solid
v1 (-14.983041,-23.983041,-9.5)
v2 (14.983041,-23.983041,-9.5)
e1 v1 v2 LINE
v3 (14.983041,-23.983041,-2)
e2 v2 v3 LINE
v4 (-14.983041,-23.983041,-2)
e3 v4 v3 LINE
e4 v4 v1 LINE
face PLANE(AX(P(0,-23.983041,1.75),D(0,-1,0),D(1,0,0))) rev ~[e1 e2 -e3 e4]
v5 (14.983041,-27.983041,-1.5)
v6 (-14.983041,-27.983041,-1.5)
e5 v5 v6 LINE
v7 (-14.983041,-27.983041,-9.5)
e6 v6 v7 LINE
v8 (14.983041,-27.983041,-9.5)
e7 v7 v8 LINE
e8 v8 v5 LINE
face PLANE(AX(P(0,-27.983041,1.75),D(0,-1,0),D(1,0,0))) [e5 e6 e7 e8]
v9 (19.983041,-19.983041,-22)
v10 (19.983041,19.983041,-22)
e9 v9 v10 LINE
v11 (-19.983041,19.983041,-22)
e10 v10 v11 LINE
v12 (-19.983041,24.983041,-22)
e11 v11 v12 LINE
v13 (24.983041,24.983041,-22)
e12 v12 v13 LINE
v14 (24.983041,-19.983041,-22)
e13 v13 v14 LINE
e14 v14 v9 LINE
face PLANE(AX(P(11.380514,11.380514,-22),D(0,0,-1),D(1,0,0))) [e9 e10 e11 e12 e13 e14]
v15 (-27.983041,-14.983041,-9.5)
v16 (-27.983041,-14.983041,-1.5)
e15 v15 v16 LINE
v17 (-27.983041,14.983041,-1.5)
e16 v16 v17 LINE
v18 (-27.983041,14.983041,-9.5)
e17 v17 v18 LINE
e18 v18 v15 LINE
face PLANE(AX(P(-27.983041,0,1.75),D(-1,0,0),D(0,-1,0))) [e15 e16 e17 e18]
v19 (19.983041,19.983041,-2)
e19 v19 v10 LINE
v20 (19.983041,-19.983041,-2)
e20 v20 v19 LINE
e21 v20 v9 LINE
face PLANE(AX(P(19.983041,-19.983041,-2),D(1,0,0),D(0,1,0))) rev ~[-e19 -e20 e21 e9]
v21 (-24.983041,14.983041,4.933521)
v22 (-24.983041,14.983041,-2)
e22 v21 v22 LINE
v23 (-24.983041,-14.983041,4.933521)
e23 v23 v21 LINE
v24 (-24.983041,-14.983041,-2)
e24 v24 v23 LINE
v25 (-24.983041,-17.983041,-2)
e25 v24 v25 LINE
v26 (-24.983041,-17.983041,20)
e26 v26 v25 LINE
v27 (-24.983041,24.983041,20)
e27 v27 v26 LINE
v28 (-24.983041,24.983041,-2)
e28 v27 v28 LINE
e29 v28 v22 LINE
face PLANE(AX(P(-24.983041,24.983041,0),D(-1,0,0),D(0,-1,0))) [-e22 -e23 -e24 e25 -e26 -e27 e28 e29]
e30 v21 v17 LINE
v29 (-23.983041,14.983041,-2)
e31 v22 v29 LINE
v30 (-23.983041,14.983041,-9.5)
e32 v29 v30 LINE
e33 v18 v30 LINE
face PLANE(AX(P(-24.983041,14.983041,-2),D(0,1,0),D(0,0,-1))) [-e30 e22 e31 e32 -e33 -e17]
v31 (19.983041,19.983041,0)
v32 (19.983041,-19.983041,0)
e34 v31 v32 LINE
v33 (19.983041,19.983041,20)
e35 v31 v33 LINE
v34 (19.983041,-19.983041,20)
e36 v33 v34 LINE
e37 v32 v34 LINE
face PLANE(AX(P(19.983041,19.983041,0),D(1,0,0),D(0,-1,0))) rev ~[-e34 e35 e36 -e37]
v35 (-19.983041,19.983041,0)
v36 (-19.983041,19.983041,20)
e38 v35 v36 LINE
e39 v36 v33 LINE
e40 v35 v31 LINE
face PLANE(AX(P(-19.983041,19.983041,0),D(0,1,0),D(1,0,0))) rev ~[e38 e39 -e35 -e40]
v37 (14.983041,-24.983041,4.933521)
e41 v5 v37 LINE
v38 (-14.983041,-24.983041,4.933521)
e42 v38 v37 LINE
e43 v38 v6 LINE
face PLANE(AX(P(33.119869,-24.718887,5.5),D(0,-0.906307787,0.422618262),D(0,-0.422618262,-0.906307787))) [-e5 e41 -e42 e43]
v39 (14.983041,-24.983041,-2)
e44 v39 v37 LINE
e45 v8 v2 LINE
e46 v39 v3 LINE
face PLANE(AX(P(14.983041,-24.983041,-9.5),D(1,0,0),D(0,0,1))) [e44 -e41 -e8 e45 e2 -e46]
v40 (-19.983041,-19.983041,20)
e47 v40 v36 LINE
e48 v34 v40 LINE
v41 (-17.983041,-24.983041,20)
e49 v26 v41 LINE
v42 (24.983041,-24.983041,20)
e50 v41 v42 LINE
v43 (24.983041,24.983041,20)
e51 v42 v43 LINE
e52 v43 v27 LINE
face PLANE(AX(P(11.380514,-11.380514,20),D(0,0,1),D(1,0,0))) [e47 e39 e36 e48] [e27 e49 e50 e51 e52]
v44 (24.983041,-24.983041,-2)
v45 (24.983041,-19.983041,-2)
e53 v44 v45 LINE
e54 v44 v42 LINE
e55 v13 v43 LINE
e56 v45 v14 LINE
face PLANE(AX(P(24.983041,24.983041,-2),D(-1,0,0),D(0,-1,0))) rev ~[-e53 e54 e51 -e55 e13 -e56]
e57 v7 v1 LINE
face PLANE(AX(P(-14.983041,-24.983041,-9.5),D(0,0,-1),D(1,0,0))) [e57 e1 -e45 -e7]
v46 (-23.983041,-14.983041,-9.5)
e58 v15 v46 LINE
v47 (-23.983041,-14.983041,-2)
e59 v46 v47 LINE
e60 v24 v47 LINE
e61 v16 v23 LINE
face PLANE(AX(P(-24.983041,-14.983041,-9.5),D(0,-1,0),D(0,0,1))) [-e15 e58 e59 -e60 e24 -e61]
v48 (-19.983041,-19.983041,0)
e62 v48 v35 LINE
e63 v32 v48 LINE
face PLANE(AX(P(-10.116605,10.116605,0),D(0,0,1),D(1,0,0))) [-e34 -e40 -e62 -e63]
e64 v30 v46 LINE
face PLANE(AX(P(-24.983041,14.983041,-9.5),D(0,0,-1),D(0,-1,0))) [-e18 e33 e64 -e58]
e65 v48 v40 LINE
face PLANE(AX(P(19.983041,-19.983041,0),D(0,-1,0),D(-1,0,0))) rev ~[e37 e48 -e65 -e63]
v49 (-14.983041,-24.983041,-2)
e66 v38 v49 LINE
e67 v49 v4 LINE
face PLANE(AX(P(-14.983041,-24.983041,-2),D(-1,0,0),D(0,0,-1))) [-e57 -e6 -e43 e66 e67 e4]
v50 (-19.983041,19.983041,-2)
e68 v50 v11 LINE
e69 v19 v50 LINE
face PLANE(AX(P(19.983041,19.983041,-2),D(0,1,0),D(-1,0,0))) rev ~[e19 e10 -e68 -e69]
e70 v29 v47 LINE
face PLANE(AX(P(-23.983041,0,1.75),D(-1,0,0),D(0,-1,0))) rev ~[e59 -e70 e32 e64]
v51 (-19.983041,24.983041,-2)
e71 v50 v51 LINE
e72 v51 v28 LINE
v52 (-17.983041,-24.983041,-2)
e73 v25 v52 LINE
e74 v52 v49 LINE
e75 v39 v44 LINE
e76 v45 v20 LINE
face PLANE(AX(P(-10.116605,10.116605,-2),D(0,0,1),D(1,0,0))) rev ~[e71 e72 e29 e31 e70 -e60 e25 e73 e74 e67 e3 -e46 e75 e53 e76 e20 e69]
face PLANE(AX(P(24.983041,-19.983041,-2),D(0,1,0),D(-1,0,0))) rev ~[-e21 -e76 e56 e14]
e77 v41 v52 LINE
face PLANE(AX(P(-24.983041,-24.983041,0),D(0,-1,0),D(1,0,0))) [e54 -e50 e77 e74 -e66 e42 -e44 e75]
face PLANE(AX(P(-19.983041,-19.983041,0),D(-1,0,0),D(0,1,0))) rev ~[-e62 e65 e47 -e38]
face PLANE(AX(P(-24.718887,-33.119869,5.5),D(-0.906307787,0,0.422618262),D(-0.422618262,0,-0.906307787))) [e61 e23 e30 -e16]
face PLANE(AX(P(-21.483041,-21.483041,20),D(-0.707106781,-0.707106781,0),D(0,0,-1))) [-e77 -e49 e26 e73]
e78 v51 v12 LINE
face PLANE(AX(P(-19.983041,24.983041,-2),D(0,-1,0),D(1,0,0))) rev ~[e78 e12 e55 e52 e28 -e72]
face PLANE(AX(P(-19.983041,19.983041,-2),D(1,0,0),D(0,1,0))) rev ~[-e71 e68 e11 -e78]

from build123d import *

# Parameters (mm, degrees)
F1_DEPTH     = 20
F0_W         = 39.9660819769
F0_H         = 39.9660819769
F2_DEPTH     = 2
F4_DEPTH     = 20
F5_W         = 29.9660819769
F5_H         = 7.5
F6_DEPTH     = 3
F7_T4_DEPTH  = 66.2397385768
F8_W         = 29.9660819769
F8_H         = 7.5
F9_DEPTH     = 3
F10_T4_DEPTH = 66.2397385768
F11_DEPTH    = 1
F12_DEPTH    = 1
F13_SIZE     = 7


# Not quite as in the source:
# - a fillet or chamfer that OpenCascade refuses, or shapes differently, is made with other operations: its cross-section is extruded or revolved along the edge and cut away or added


with BuildPart() as f1:
    # F0 (on Top) → F1 (new body)
    with BuildSketch(Plane.XY):
        Polygon((24.9830409884, -24.9830409884), (24.9830409884, 19.9830409884), (19.9830409884, 19.9830409884), (19.9830409884, -19.9830409884), (-19.9830409884, -19.9830409884), (-19.9830409884, -24.9830409884), align=None)
        Polygon((24.9830409884, 24.9830409884), (-24.9830409884, 24.9830409884), (-24.9830409884, -24.9830409884), (-19.9830409884, -24.9830409884), (-19.9830409884, -19.9830409884), (-19.9830409884, 19.9830409884), (19.9830409884, 19.9830409884), (24.9830409884, 19.9830409884), align=None)
    extrude(amount=F1_DEPTH)

    # F0 (on Top) → F2 (join)
    with BuildSketch(Plane.XY):
        Polygon((24.9830409884, 24.9830409884), (-24.9830409884, 24.9830409884), (-24.9830409884, -24.9830409884), (-19.9830409884, -24.9830409884), (-19.9830409884, -19.9830409884), (-19.9830409884, 19.9830409884), (19.9830409884, 19.9830409884), (24.9830409884, 19.9830409884), align=None)
        Rectangle(F0_W, F0_H)
        Polygon((24.9830409884, -24.9830409884), (24.9830409884, 19.9830409884), (19.9830409884, 19.9830409884), (19.9830409884, -19.9830409884), (-19.9830409884, -19.9830409884), (-19.9830409884, -24.9830409884), align=None)
    extrude(amount=-F2_DEPTH)

    # F3 (on face) → F4 (join)
    with BuildSketch(Plane(origin=(0, 0, -2), x_dir=(1, 0, 0), z_dir=(0, 0, -1))):
        Polygon((24.9830409884, -24.9830409884), (24.9830409884, 19.9830409884), (19.9830409884, 19.9830409884), (19.9830409884, -19.9830409884), (-19.9830409884, -19.9830409884), (-19.9830409884, -24.9830409884), align=None)
    extrude(amount=F4_DEPTH)

    # F5 (on face) → F6 (join)
    with BuildSketch(Plane(origin=(-24.9830409884, 0, 0), x_dir=(0, -1, 0), z_dir=(-1, 0, 0))):
        with Locations((0, 1.75)):
            Rectangle(F5_W, F5_H)
        with Locations((0, -5.75)):
            Rectangle(F5_W, F5_H)
    extrude(amount=F6_DEPTH)

    # F7: chamfer of 7 x 3.2641536071 on 1 edges, made by hand


with BuildPart() as f7_tool2:
    # F7_s3 → F7_t4 (new body)
    with BuildSketch(Plane.XZ.offset(33.1198692884)):
        Polygon((-24.7188873814, 5.5), (-27.9830409884, -1.5), (-27.9830409884, 5.5), align=None)
    extrude(amount=-F7_T4_DEPTH)

    split(bisect_by=Plane.YZ.offset(-24.9830409884), keep=Keep.BOTTOM)


with BuildPart() as f1_1:
    add(f1.part)

    # F7_t1: cut F7_tool2
    add(f7_tool2.part, mode=Mode.SUBTRACT)

    # F8 (on face) → F9 (join)
    with BuildSketch(Plane.XZ.offset(24.9830409884)):
        with Locations((0, 1.75)):
            Rectangle(F8_W, F8_H)
        with Locations((0, -5.75)):
            Rectangle(F8_W, F8_H)
    extrude(amount=F9_DEPTH)

    # F10: chamfer of 7 x 3.2641536071 on 1 edges, made by hand


with BuildPart() as f10_tool2:
    # F10_s3 → F10_t4 (new body)
    with BuildSketch(Plane.YZ.offset(33.1198692884)):
        Polygon((-24.7188873814, 5.5), (-27.9830409884, -1.5), (-27.9830409884, 5.5), align=None)
    extrude(amount=-F10_T4_DEPTH)

    split(bisect_by=Plane.XZ.offset(24.9830409884), keep=Keep.TOP)


with BuildPart() as f1_2:
    add(f1_1.part)

    # F10_t1: cut F10_tool2
    add(f10_tool2.part, mode=Mode.SUBTRACT)

    # F11 (add): a face of the model
    f11_faces = [f1_2.faces().sort_by_distance(p)[0] for p in [
        (0, -24.9830409884, -5.75),
    ]]
    extrude(f11_faces, amount=F11_DEPTH)

    # F12 (add): a face of the model
    f12_faces = [f1_2.faces().sort_by_distance(p)[0] for p in [
        (-24.9830409884, 0, -5.75),
    ]]
    extrude(f12_faces, amount=F12_DEPTH)

    # F13
    f13_edges = [f1_2.edges().sort_by_distance(p)[0] for p in [
        (-24.983041, -24.983041, 9),
    ]]
    chamfer(f13_edges, length=F13_SIZE)


solid = f1_2.part
